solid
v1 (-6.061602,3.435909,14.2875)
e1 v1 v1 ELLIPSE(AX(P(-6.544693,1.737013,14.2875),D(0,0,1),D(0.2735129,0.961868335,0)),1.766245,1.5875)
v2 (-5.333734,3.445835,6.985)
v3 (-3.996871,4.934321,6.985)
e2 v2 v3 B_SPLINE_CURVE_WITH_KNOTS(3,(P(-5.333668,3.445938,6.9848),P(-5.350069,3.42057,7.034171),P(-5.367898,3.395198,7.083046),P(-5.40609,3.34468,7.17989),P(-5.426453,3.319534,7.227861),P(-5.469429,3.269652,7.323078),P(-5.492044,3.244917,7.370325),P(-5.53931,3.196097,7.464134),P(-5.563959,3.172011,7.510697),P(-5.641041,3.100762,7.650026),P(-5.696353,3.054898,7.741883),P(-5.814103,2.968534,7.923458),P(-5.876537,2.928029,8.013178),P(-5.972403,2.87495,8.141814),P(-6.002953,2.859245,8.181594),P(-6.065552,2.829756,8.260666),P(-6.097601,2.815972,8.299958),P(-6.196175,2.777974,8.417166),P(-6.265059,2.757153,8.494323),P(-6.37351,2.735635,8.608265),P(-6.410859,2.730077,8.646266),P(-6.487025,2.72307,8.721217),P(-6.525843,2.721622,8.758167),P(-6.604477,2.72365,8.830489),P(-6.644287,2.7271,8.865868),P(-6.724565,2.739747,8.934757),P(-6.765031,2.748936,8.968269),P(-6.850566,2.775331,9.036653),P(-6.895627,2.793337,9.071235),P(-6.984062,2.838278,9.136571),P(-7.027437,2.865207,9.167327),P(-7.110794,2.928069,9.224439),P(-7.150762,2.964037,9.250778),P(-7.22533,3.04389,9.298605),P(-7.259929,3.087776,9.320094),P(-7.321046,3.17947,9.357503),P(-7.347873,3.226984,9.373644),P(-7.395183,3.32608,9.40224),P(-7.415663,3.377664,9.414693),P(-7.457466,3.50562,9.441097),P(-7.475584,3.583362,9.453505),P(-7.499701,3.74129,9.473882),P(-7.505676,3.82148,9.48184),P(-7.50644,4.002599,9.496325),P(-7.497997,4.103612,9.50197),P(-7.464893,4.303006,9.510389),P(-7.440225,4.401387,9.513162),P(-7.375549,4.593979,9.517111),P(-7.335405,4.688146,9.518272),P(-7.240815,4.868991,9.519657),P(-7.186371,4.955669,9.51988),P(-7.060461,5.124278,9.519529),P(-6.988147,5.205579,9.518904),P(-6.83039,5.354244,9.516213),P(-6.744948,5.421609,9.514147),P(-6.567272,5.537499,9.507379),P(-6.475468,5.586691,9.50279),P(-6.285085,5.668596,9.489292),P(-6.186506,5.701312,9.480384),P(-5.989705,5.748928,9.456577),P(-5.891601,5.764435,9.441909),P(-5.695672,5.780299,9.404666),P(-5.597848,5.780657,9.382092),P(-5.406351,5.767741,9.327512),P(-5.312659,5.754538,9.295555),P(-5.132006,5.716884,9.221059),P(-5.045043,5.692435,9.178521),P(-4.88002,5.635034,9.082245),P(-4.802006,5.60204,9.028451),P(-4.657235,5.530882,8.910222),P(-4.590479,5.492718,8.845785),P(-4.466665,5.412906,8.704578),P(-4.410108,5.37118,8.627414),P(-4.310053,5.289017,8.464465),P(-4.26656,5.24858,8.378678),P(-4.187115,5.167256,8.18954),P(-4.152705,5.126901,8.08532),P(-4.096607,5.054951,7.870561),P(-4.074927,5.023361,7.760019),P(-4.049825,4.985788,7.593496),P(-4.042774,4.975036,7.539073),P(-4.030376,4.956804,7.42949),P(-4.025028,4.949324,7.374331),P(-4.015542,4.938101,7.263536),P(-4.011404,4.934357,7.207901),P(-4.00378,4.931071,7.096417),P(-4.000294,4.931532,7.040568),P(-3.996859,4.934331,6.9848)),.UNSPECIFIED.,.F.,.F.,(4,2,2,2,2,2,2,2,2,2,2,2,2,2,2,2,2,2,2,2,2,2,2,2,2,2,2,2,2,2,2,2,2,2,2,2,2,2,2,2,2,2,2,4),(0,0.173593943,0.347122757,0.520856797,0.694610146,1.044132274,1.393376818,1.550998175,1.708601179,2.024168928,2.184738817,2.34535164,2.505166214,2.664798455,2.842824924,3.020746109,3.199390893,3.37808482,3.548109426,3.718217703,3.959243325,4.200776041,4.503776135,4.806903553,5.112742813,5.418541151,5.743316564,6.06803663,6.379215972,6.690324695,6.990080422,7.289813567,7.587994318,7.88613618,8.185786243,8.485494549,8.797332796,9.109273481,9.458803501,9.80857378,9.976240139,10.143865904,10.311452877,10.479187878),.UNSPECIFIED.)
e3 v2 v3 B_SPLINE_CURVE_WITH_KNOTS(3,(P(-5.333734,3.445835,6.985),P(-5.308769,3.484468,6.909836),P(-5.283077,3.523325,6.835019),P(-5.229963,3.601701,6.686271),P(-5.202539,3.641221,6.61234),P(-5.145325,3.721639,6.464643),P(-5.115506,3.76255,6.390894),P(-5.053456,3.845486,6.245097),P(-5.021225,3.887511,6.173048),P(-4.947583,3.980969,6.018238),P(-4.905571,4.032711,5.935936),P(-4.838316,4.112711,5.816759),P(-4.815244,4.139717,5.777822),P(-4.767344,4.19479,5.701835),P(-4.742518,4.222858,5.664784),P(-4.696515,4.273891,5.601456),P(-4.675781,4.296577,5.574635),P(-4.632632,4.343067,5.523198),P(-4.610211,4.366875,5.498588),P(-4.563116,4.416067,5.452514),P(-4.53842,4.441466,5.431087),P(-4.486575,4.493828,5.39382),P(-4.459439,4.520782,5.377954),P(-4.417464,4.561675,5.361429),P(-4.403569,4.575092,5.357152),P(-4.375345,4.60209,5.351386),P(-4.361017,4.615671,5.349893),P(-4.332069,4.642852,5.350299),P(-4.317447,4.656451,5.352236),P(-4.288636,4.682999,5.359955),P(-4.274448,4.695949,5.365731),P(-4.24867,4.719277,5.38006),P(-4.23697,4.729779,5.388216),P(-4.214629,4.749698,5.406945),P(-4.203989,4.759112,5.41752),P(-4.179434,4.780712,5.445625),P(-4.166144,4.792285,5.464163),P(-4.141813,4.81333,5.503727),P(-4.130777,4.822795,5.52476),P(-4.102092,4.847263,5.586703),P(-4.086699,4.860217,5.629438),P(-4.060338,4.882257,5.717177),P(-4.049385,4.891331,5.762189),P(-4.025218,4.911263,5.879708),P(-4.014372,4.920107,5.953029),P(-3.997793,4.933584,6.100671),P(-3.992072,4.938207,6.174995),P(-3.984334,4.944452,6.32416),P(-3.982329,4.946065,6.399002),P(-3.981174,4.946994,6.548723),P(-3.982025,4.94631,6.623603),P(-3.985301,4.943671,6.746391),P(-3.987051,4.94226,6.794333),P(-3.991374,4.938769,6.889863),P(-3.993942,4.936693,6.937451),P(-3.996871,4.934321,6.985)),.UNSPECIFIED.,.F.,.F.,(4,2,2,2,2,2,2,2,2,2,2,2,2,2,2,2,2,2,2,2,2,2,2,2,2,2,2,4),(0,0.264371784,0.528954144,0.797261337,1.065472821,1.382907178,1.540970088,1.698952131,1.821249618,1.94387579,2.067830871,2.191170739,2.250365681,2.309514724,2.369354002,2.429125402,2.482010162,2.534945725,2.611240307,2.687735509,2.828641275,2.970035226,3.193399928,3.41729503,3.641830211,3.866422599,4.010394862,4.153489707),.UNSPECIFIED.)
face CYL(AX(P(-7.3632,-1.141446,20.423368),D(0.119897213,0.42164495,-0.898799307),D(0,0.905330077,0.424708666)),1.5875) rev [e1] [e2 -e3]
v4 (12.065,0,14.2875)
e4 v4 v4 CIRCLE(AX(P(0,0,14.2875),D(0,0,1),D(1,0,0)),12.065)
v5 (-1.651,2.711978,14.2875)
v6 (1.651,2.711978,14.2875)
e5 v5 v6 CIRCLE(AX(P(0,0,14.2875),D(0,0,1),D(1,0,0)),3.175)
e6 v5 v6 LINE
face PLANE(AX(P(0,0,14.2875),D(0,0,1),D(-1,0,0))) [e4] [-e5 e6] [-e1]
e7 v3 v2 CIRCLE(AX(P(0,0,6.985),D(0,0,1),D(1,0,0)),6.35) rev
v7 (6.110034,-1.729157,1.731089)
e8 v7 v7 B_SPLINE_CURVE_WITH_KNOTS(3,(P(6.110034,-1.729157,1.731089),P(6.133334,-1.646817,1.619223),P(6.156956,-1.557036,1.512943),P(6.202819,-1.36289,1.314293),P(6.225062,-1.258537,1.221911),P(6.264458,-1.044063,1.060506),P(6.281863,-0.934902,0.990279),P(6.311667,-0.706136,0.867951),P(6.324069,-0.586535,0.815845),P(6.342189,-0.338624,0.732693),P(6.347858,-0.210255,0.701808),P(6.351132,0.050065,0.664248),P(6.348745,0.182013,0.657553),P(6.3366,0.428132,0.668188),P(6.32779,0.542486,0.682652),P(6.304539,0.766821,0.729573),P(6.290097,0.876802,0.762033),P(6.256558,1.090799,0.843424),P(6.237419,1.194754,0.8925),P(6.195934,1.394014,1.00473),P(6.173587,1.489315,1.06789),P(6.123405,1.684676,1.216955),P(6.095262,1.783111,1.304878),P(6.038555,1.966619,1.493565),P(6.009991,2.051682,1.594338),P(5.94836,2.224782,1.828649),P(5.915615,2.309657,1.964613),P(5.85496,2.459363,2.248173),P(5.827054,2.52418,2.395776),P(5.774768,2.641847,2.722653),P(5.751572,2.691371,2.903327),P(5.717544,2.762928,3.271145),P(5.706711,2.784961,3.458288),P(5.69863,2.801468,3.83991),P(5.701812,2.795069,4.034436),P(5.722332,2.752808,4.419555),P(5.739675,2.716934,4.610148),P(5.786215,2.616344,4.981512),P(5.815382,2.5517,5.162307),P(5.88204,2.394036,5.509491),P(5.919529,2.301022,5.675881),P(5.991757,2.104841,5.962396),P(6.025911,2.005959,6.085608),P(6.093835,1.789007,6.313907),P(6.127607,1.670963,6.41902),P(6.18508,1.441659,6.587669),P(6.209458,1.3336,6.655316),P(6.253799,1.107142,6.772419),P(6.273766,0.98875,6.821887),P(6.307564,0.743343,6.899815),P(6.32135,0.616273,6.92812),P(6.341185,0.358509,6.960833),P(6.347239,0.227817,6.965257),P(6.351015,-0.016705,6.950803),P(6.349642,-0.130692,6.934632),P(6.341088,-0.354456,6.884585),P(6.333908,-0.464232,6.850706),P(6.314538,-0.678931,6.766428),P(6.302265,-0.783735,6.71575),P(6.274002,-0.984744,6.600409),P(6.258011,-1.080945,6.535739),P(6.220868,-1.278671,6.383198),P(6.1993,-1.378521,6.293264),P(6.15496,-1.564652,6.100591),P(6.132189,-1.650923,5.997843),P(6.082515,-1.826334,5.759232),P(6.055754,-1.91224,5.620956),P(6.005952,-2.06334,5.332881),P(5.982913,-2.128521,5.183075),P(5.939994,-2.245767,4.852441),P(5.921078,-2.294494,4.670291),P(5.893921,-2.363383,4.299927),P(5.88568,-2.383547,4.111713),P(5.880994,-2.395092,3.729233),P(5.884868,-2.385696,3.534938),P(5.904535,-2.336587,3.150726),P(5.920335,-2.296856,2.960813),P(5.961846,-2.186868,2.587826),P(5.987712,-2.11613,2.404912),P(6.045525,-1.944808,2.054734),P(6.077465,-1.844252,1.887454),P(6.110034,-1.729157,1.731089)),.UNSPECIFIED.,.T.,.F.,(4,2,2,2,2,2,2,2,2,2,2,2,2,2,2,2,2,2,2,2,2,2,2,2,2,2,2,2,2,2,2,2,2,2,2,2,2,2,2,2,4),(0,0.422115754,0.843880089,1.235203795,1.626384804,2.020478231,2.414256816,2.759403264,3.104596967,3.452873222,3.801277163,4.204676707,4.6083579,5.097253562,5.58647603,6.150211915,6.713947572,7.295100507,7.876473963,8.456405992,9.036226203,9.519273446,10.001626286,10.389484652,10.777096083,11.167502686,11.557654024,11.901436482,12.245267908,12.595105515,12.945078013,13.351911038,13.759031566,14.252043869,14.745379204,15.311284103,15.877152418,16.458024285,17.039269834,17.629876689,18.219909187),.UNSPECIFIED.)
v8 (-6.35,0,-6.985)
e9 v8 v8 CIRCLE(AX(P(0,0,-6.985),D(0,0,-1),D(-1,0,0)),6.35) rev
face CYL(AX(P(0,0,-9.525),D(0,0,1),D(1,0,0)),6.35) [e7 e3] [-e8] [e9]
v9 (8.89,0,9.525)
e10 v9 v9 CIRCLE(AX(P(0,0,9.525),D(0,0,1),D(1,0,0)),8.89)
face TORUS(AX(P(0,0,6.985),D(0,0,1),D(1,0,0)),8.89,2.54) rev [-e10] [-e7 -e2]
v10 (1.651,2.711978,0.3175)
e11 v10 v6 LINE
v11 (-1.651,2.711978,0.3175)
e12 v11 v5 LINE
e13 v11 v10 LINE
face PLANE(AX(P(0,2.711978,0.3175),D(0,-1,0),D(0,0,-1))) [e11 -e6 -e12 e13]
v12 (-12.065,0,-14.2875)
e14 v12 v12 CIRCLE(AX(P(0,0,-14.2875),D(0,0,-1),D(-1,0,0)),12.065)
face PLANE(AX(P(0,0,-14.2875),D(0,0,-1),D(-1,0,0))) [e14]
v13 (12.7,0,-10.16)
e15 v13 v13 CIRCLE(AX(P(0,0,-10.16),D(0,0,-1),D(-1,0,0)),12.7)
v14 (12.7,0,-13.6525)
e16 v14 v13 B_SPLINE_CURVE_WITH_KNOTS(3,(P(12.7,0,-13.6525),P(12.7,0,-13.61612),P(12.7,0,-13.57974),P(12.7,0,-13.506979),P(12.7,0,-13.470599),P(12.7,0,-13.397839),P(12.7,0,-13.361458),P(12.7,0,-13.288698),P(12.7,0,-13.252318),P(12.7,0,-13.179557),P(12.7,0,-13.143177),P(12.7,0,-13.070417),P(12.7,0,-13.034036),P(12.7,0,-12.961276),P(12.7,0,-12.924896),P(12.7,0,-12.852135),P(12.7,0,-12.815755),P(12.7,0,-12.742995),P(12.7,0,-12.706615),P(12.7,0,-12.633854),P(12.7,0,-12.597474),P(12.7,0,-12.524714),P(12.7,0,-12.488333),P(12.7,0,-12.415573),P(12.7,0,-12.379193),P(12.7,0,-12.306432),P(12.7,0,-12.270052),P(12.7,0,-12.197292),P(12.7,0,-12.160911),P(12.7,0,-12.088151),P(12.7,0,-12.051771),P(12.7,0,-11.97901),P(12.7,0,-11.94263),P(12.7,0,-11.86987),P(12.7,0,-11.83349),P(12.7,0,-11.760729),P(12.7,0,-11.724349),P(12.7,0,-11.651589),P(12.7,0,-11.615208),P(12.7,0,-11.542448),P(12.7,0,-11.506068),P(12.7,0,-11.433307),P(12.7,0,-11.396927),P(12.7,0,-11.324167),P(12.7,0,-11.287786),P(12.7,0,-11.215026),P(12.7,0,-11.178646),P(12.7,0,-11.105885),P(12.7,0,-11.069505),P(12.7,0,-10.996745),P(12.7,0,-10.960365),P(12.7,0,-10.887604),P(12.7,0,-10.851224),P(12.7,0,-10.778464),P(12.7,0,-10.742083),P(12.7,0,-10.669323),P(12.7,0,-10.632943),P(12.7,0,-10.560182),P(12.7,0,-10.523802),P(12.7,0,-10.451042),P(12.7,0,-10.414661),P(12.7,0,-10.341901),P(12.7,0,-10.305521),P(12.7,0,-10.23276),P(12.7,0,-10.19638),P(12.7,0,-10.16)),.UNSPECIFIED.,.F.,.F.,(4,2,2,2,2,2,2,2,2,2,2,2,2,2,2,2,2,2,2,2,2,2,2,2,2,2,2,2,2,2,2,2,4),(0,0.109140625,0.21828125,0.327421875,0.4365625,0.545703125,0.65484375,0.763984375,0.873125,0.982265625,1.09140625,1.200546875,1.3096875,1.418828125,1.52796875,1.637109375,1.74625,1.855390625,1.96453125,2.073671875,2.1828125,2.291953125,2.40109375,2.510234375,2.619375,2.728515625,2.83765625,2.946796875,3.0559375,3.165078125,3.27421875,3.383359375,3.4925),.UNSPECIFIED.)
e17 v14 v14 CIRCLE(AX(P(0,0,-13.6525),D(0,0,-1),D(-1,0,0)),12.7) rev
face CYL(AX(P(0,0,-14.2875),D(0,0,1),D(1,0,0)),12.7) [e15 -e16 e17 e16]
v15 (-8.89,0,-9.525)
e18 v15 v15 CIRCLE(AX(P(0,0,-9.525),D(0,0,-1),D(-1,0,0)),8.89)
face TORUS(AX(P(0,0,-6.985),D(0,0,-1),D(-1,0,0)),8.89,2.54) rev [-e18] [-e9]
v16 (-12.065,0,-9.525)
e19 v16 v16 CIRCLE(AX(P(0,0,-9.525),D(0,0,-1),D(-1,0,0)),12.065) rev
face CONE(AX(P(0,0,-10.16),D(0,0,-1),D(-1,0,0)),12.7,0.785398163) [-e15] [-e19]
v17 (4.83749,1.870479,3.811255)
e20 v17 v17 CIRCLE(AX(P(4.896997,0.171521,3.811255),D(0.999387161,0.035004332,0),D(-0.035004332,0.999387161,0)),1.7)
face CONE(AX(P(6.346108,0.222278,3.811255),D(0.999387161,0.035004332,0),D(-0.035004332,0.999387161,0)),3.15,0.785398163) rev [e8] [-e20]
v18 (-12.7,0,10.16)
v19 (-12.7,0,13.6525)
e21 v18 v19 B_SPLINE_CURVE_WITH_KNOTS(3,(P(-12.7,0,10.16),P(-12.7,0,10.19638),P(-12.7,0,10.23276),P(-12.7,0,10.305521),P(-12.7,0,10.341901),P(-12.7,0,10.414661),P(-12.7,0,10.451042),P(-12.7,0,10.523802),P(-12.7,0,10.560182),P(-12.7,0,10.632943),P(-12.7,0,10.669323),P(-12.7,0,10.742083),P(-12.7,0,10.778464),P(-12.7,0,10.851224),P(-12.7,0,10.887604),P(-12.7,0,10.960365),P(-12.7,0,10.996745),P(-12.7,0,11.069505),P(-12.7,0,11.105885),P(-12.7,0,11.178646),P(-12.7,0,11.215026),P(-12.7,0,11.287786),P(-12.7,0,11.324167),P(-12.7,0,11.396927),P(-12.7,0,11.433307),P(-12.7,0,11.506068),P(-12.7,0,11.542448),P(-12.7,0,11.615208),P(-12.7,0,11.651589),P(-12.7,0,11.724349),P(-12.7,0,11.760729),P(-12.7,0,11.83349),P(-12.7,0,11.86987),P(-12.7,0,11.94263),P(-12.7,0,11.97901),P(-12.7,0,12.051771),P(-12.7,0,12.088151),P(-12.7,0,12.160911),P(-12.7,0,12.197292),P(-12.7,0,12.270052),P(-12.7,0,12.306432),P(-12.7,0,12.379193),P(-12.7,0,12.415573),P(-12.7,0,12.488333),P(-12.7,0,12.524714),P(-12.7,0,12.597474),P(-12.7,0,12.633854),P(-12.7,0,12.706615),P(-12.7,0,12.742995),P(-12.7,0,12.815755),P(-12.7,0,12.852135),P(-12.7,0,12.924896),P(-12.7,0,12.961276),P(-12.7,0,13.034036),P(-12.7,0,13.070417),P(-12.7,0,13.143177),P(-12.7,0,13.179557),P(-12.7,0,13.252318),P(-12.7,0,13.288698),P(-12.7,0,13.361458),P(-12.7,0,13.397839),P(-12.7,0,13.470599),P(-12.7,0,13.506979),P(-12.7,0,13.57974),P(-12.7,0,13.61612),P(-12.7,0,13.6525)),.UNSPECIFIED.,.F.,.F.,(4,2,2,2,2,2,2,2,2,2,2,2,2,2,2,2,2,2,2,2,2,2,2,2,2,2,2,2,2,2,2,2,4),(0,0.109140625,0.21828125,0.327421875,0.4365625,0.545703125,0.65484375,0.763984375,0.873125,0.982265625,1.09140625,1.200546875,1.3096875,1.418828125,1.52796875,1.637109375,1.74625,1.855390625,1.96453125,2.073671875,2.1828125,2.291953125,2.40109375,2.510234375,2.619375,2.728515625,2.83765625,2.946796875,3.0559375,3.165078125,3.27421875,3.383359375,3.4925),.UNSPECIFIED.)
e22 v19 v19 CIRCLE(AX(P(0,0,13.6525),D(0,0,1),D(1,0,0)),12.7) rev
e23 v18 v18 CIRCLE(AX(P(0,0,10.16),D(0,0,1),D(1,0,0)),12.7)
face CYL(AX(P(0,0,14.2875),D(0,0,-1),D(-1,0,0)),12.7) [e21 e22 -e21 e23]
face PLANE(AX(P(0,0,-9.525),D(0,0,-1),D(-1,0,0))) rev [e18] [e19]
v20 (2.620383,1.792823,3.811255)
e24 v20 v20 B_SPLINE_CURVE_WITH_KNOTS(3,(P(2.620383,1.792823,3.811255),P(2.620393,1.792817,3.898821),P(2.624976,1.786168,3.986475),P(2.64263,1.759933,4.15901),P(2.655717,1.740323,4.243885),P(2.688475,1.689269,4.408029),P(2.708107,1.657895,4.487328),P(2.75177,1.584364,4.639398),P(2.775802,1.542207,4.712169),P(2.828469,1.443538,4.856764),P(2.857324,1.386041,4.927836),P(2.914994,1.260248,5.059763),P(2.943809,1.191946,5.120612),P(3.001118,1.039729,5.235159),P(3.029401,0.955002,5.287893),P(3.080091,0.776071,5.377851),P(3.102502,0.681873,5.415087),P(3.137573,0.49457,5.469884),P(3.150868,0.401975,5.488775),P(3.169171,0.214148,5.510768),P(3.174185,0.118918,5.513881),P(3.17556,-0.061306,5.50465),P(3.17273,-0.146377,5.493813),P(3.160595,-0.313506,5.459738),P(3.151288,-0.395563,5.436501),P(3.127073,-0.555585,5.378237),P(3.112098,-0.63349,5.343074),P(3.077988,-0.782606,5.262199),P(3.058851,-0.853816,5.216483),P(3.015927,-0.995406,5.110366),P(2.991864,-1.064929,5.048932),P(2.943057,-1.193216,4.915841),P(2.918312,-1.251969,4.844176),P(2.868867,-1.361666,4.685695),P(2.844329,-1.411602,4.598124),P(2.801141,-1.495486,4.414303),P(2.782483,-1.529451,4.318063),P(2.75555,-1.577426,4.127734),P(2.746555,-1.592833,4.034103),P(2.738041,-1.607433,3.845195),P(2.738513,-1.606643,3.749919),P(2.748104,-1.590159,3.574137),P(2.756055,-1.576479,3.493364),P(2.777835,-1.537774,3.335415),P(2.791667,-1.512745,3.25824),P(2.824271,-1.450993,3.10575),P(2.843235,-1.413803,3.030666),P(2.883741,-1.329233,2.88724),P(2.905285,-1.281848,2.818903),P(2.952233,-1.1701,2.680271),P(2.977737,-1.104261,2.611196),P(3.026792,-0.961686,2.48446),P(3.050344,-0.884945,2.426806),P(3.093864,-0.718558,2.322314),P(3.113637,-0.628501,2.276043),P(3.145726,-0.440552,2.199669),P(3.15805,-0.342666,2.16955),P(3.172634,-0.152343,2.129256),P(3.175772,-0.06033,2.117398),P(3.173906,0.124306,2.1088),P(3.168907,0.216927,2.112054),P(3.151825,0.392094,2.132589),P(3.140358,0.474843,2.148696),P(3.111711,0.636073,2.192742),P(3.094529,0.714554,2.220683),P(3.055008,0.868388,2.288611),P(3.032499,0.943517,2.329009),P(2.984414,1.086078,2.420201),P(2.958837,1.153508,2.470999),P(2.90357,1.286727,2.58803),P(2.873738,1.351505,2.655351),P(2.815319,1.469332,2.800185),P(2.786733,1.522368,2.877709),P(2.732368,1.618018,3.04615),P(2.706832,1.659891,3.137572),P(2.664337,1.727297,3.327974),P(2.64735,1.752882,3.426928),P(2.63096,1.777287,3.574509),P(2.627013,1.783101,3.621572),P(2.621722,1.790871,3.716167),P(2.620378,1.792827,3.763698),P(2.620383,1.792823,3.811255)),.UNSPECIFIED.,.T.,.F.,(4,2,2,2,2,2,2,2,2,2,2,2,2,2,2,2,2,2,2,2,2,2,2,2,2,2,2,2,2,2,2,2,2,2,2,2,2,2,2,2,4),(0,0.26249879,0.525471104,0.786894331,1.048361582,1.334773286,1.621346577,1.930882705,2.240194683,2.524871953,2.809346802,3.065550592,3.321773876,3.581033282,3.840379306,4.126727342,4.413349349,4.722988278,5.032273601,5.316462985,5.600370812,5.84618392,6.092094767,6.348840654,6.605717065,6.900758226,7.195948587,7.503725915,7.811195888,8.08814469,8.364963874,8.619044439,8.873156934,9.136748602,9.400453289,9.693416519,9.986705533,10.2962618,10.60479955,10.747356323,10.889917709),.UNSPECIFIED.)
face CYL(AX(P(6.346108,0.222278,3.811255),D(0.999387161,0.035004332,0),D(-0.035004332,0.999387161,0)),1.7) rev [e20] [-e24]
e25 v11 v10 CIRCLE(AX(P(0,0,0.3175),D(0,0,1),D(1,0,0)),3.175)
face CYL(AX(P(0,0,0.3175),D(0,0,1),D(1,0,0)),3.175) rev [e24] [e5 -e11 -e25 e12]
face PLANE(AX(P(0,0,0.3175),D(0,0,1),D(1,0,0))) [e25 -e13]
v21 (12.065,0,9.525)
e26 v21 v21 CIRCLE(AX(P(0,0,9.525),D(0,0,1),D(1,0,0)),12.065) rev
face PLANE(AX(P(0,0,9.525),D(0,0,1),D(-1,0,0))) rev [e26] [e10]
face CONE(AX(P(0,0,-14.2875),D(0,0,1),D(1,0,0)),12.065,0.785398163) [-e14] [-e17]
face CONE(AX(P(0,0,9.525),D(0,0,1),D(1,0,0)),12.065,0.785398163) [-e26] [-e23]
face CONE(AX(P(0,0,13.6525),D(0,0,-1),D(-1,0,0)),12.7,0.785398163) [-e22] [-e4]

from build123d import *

# Parameters (mm, degrees)
BOSS_EXTRUDE1_DEPTH            = 9.525
BOSS_EXTRUDE1_DEPTH_BACK       = 9.525
SKETCH1_R                      = 6.35
SKETCH1_R_2                    = 3.175
SKETCH2_R                      = 12.7
SKETCH2_R_2                    = 6.35
SKETCH2_R_3                    = 3.175
BOSS_EXTRUDE3_DEPTH            = 4.7625
SKETCH3_R                      = 3.175
BOSS_EXTRUDE4_DEPTH            = 28.575
FILLET1_R                      = 2.54
CHAMFER1_SIZE                  = 0.635
CUT_EXTRUDE1_DEPTH             = 13.97
CUT_EXTRUDE2_REACH             = 39.354
SKETCH6_R                      = 1.5875
CUT_EXTRUDE2_DIRECTION_2_REACH = 39.354


# Read off the part's stored shape, not the designer's step: CSK for M3 Flat Head Machine Screw1
with BuildPart() as part:
    # Sketch1 → Boss-Extrude1 (new, two sides: drawn at the far end of the back side and taken through both)
    with BuildSketch(Plane.XY.offset(-BOSS_EXTRUDE1_DEPTH_BACK)):
        Circle(SKETCH1_R)
        Circle(SKETCH1_R_2, mode=Mode.SUBTRACT)
    extrude(amount=BOSS_EXTRUDE1_DEPTH + BOSS_EXTRUDE1_DEPTH_BACK)

    # Sketch2 → Boss-Extrude3 (add)
    # profile 1 of 2: a face of its own
    with BuildSketch(Plane(origin=(0, 0, -9.525), x_dir=(-1, 0, 0), z_dir=(0, 0, -1))):
        with Locations(Location((0, 0, 0), (0, 0, 180))):
            Circle(SKETCH2_R)
        with Locations(Location((0, 0, 0), (0, 0, 180))):
            Circle(SKETCH2_R_2, mode=Mode.SUBTRACT)
    # profile 2 of 2: a face of its own
    with BuildSketch(Plane(origin=(0, 0, -9.525), x_dir=(-1, 0, 0), z_dir=(0, 0, -1))):
        with Locations(Location((0, 0, 0), (0, 0, 180))):
            Circle(SKETCH2_R_2)
        with Locations(Location((0, 0, 0), (0, 0, 180))):
            Circle(SKETCH2_R_3, mode=Mode.SUBTRACT)
    boss_extrude3 = extrude(amount=BOSS_EXTRUDE3_DEPTH)

    # Mirror1: Boss-Extrude3 across plane
    add(boss_extrude3.mirror(Plane.XY))

    # Sketch3 → Boss-Extrude4 (add, through all)
    with BuildSketch(Plane(origin=(0, 0, -14.2875), x_dir=(-1, 0, 0), z_dir=(0, 0, -1))):
        Circle(SKETCH3_R)
    extrude(amount=-BOSS_EXTRUDE4_DEPTH)

    # Fillet1
    fillet1_edges = [part.edges().sort_by_distance(p)[0] for p in [
        (-6.35, 0, -9.525),
        (-6.35, 0, 9.525),
    ]]
    fillet(fillet1_edges, radius=FILLET1_R)

    # Chamfer1
    chamfer1_edges = [part.edges().sort_by_distance(p)[0] for p in [
        (-12.7, 0, -9.525),
        (-12.7, 0, -14.2875),
        (-12.7, 0, 14.2875),
        (-12.7, 0, 9.525),
    ]]
    chamfer(chamfer1_edges, length=CHAMFER1_SIZE)

    # Sketch4 → Cut-Extrude1 (cut)
    with BuildSketch(Plane.XY.offset(14.2875)):
        with BuildLine():
            Line((1.651, 2.711977876), (-1.651, 2.711977876))
            ThreePointArc((-1.651, 2.711977876), (-1.555425987, -2.767900829), (3.175, 0))
            ThreePointArc((3.175, 0), (2.767900829, 1.555425987), (1.651, 2.711977876))
        make_face()
    extrude(amount=-CUT_EXTRUDE1_DEPTH, mode=Mode.SUBTRACT)

    # Sketch6 → Cut-Extrude2 (cut, up to next)
    with BuildSketch(Plane(origin=(-6.544693312, 1.737013471, 14.2875), x_dir=(0.9927863104442903, -0.05092138559106857, 0.1085465535330304), z_dir=(-0.11989721345558171, -0.4216449495917331, 0.8987993072368112)), mode=Mode.PRIVATE) as cut_extrude2_sk1:
        with Locations(Location((0, 0, 0), (0, 0, 75.6633116))):
            Circle(SKETCH6_R)
    cut_extrude2_tool1 = extrude(cut_extrude2_sk1.sketch, amount=-CUT_EXTRUDE2_REACH, mode=Mode.PRIVATE) & part.part
    add(cut_extrude2_tool1.solids().sort_by_distance((-6.544693, 1.737013, 14.2875))[0], mode=Mode.SUBTRACT)

    # Sketch6 → Cut-Extrude2 direction 2 (cut, up to next)
    with BuildSketch(Plane(origin=(-6.544693312, 1.737013471, 14.2875), x_dir=(0.9927863104442903, -0.05092138559106857, 0.1085465535330304), z_dir=(-0.11989721345558171, -0.4216449495917331, 0.8987993072368112)), mode=Mode.PRIVATE) as cut_extrude2_direction_2_sk1:
        with Locations(Location((0, 0, 0), (0, 0, 75.6633116))):
            Circle(SKETCH6_R)
    cut_extrude2_direction_2_tool1 = extrude(cut_extrude2_direction_2_sk1.sketch, amount=CUT_EXTRUDE2_DIRECTION_2_REACH, mode=Mode.PRIVATE) & part.part
    add(cut_extrude2_direction_2_tool1.solids().sort_by_distance((-6.544693, 1.737013, 14.2875))[0], mode=Mode.SUBTRACT)

    # CSK for M3 Flat Head Machine Screw1 outl → CSK for M3 Flat Head Machine Screw1 (revolve, cut)
    with BuildSketch(Plane(origin=(0, 0, 3.811254633), x_dir=(-0.0350043317696159, 0.9993871605926117, 0), z_dir=(0, 0, -1))):
        Polygon((0, 2.681318057), (1.7, 2.681318057), (1.7, 4.9), (3.150097206, 6.350097206), (0, 6.350097206), align=None)
    revolve(axis=Axis((0, 0, 3.811254633), (0.9993871605926117, 0.0350043317696159, 0)), mode=Mode.SUBTRACT)


solid = part.part
